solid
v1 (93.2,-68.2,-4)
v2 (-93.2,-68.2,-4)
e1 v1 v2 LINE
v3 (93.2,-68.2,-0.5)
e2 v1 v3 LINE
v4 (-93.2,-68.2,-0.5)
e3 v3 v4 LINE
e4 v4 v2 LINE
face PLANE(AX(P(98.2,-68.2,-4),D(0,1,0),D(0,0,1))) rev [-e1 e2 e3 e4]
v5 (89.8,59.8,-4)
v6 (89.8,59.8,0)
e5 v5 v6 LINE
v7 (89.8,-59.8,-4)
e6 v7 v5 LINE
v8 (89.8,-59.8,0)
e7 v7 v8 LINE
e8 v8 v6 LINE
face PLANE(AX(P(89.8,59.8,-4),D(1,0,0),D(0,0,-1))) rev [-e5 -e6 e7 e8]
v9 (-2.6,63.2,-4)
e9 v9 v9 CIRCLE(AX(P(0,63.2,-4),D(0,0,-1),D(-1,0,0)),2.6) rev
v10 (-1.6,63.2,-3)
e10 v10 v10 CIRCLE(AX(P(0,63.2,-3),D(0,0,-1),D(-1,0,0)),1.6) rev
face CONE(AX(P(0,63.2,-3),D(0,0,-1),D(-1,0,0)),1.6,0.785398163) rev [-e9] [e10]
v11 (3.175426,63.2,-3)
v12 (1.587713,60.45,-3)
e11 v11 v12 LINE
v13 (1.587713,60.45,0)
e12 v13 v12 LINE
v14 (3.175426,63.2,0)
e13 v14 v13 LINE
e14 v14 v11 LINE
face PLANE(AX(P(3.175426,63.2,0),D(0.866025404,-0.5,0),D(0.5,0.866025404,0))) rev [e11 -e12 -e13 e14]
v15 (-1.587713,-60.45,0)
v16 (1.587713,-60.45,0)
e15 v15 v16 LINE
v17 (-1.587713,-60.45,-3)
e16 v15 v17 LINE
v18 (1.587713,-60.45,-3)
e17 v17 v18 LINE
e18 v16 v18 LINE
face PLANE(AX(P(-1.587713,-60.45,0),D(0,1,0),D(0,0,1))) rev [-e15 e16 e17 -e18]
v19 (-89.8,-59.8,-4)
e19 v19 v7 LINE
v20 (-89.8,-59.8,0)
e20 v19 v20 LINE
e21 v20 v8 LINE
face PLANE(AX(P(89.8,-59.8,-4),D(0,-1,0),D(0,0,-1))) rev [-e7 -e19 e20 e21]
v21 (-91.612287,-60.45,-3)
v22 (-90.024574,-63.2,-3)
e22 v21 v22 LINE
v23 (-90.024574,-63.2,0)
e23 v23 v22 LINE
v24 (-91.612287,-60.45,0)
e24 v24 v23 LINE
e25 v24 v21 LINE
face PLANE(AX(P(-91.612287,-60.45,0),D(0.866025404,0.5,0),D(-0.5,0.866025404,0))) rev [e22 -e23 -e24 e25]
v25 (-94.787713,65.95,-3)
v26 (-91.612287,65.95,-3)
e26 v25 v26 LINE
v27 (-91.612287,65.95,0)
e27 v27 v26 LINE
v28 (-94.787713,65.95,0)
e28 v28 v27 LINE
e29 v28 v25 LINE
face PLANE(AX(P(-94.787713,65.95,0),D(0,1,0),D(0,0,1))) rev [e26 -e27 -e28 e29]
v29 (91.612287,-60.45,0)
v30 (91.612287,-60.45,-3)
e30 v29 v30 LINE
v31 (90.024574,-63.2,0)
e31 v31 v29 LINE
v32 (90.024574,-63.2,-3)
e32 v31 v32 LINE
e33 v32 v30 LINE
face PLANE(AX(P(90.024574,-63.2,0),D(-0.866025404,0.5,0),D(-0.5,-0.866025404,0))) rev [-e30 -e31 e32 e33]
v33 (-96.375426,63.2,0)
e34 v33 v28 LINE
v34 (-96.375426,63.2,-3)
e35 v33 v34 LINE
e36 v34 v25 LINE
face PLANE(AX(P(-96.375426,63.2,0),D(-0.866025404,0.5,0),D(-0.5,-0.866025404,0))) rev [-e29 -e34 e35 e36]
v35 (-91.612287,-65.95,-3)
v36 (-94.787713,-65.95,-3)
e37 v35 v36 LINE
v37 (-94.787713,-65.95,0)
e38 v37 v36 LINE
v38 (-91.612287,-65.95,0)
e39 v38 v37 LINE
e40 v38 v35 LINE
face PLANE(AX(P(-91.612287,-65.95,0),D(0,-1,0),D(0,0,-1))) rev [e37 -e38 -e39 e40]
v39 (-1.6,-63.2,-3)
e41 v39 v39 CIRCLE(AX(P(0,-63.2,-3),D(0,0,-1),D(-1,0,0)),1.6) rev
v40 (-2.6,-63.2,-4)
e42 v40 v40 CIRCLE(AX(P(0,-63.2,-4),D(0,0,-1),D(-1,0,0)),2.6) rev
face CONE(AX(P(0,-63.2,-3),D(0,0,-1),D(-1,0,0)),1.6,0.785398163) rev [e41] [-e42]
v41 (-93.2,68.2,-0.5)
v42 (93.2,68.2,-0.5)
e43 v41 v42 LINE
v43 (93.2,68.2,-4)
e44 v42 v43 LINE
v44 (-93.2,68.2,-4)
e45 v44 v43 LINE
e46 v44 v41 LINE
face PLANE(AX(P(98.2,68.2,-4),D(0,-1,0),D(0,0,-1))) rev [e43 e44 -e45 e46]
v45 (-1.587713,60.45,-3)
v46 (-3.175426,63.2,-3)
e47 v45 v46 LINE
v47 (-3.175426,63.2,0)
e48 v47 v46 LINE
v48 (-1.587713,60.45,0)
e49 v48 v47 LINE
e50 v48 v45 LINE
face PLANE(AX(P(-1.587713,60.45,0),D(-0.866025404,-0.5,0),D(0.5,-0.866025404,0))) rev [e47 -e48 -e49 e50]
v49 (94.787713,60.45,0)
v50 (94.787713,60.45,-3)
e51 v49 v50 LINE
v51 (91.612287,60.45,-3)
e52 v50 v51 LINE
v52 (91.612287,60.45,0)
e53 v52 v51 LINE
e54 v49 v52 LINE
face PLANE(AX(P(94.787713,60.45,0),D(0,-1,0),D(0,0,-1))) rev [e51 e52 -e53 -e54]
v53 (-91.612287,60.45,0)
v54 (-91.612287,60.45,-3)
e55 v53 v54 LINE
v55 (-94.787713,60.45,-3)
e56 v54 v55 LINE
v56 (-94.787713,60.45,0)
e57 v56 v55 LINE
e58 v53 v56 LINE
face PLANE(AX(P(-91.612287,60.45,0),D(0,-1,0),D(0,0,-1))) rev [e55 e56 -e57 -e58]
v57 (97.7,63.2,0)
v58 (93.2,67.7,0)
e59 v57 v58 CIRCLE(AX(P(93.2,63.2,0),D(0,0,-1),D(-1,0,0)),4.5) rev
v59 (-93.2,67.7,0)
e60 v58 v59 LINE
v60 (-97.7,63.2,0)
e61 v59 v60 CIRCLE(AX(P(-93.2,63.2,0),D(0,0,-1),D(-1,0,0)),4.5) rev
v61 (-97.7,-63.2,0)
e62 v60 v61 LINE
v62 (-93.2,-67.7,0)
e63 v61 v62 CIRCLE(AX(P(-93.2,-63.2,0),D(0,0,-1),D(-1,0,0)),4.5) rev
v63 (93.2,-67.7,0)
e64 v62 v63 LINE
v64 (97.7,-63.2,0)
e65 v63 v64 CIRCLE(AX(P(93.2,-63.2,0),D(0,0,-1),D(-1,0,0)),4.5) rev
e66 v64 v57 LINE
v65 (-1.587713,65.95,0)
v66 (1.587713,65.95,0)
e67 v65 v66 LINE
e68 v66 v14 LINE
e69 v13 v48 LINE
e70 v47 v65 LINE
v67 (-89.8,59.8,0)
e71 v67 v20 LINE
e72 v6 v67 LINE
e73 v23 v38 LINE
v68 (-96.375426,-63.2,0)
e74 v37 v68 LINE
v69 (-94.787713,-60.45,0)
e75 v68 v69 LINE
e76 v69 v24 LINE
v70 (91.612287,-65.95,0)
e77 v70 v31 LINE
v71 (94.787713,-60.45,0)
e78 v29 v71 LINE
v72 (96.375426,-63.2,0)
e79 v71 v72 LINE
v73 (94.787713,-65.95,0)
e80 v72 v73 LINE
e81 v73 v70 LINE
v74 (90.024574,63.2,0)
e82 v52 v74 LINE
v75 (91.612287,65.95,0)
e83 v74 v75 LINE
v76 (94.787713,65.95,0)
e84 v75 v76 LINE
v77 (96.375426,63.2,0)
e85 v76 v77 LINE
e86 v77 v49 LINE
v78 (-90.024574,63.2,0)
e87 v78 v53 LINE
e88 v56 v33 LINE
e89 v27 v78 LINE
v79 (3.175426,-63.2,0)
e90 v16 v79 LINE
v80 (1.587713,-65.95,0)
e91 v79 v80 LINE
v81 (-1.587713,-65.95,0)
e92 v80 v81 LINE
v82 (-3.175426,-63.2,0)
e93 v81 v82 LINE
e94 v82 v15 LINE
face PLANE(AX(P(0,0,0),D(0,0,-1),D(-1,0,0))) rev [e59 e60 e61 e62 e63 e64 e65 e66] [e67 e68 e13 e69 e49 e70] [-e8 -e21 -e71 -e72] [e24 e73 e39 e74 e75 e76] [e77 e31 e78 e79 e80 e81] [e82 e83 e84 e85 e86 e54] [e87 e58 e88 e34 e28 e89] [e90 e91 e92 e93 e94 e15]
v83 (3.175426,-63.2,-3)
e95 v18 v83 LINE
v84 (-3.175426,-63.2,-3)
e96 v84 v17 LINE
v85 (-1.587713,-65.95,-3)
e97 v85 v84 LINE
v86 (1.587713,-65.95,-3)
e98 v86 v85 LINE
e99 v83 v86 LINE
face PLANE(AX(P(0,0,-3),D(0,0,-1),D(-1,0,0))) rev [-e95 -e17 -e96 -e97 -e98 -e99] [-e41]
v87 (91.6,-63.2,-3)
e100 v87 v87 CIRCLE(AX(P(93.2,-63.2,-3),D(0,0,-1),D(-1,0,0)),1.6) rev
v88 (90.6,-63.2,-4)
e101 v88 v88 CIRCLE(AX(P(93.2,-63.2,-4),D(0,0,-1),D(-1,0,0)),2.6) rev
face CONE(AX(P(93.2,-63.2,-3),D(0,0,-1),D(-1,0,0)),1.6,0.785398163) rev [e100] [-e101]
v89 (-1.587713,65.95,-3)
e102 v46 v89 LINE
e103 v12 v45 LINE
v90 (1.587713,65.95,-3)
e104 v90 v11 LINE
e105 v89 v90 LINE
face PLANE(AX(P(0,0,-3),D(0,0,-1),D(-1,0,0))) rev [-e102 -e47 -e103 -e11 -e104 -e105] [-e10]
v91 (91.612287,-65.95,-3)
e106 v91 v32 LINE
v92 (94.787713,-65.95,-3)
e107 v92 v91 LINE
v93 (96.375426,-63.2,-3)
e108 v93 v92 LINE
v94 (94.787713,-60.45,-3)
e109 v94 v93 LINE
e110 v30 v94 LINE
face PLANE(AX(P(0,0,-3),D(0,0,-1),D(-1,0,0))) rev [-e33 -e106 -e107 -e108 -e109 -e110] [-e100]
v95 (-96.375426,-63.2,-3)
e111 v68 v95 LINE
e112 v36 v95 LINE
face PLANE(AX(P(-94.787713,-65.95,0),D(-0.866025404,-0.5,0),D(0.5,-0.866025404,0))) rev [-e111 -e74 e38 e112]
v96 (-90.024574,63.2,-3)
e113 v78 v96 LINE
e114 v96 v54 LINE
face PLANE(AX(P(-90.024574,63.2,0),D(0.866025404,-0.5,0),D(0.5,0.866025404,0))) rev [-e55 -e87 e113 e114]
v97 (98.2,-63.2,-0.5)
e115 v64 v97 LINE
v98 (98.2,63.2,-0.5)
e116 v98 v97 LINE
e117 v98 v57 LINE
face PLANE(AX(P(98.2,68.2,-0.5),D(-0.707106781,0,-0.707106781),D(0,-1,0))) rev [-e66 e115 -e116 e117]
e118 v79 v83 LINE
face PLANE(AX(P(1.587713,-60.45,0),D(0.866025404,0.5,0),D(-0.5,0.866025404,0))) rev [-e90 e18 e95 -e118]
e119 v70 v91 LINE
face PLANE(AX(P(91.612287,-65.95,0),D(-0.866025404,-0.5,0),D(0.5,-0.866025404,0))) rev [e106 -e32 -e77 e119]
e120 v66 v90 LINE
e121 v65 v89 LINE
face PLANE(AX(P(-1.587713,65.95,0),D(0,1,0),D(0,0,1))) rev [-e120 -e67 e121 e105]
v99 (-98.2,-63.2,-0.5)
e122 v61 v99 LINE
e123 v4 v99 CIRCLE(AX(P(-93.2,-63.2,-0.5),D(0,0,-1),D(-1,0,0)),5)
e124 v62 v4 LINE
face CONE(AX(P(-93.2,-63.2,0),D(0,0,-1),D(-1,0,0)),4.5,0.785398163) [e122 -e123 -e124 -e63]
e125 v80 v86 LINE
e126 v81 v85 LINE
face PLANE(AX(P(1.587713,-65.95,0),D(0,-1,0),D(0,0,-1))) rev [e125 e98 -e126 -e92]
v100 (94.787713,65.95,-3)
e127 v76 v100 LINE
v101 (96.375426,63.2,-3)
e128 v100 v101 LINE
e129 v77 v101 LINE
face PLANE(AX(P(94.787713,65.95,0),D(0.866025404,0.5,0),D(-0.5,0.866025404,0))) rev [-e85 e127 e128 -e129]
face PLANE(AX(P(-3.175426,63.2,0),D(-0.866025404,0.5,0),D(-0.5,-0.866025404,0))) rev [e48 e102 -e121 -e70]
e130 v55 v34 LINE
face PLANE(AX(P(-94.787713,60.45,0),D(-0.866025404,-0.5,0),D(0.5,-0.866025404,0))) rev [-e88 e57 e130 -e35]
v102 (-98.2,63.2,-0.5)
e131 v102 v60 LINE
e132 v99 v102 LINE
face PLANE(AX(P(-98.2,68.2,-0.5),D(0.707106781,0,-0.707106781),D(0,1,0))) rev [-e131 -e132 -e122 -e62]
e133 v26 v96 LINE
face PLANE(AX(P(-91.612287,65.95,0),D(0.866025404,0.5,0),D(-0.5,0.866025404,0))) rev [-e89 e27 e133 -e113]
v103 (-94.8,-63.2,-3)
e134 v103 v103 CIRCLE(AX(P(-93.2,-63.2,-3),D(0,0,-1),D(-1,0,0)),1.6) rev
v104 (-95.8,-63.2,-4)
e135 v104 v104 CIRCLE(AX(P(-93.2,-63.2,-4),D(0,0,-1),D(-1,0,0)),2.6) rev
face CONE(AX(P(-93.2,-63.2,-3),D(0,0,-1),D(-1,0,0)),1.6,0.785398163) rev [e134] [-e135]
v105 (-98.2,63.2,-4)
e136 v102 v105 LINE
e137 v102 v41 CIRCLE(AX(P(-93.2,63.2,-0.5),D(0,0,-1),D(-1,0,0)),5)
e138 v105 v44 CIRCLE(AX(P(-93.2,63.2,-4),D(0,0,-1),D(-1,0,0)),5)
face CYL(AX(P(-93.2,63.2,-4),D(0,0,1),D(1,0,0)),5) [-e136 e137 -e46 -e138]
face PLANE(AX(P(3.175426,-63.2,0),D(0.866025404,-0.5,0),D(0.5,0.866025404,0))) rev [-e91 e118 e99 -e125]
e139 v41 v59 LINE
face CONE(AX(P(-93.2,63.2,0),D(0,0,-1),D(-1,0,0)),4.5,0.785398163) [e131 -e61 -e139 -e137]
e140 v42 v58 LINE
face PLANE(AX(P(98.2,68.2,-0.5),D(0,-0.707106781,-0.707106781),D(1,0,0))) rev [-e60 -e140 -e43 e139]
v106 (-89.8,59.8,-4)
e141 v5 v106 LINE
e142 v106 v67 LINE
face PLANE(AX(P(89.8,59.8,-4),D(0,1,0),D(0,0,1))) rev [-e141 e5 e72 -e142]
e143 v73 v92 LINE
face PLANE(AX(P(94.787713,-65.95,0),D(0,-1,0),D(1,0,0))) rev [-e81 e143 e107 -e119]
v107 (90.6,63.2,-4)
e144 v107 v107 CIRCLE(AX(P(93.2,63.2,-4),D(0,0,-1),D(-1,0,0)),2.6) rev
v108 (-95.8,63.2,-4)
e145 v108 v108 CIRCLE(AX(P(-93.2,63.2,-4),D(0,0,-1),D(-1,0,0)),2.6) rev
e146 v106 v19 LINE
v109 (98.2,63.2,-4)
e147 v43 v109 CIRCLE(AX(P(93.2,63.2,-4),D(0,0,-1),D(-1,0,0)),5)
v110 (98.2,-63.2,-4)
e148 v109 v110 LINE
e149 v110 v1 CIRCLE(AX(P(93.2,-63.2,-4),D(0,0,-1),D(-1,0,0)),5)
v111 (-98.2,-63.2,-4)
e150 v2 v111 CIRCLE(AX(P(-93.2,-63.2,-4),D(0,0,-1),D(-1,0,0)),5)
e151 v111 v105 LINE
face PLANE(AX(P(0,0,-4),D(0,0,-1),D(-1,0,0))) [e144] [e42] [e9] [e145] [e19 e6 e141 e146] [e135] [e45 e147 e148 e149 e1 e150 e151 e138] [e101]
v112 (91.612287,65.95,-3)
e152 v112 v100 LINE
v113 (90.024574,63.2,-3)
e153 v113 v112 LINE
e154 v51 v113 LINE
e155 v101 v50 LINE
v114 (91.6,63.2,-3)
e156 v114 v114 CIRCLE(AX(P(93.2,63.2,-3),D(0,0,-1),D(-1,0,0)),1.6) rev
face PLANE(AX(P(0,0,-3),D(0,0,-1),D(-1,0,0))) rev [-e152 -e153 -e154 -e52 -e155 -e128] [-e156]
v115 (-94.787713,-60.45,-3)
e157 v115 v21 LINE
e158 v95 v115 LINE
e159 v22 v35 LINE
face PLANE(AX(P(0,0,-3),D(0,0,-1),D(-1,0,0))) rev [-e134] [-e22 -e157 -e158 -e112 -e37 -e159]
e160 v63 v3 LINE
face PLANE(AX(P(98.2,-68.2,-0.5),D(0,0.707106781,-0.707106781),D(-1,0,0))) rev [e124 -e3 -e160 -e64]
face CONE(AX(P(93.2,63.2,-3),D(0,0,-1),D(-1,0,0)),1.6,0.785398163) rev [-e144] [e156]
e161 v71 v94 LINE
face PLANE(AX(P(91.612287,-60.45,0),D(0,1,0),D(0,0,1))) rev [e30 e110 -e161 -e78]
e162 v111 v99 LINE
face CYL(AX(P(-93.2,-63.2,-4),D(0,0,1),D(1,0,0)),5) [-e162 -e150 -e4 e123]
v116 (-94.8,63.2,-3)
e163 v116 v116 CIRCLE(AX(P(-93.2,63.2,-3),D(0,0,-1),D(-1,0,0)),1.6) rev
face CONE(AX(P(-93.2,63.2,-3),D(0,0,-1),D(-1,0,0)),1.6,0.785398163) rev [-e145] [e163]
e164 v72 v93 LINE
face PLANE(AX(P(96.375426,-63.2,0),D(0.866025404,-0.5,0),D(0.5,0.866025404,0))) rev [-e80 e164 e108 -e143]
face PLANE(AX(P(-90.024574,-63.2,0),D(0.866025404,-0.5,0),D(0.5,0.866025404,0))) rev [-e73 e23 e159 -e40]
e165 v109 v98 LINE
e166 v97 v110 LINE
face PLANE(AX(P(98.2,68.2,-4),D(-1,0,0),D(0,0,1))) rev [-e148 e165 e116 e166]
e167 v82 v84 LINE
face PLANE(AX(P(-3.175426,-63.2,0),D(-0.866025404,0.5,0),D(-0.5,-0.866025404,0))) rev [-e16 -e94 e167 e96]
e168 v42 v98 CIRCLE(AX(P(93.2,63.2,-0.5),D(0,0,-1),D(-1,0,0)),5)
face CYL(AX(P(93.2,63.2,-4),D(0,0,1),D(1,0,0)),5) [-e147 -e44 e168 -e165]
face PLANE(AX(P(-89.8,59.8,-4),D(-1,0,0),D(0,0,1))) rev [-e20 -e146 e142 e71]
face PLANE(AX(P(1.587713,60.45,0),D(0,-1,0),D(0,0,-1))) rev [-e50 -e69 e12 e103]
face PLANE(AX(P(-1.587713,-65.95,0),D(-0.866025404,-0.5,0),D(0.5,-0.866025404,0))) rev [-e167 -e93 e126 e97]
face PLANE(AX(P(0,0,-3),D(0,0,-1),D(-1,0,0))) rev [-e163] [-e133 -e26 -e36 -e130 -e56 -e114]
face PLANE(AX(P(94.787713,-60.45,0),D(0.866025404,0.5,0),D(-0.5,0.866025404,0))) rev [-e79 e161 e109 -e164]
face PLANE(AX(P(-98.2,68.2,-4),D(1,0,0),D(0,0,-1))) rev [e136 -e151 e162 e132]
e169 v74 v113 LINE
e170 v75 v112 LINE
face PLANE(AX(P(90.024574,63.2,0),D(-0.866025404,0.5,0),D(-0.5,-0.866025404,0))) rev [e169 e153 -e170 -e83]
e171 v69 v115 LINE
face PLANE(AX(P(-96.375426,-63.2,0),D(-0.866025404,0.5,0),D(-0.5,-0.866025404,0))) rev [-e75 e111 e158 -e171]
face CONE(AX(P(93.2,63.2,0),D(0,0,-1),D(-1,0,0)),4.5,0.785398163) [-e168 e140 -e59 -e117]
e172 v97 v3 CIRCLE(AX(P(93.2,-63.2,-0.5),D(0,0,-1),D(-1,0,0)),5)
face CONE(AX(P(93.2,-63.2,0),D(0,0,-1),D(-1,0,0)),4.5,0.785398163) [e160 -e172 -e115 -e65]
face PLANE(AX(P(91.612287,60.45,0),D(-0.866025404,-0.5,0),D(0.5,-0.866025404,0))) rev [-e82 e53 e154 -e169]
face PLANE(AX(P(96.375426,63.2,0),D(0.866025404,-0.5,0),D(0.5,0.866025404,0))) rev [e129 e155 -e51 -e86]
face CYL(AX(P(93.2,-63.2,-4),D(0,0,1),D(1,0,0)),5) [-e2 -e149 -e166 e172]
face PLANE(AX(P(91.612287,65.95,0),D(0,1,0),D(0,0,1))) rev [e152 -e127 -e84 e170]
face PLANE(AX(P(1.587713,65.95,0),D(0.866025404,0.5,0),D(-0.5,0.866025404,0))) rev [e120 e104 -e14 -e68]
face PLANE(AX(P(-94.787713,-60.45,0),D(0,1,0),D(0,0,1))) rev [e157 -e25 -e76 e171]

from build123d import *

# Parameters (mm, degrees)
CROQUIS1_W              = 179.6
CROQUIS1_H              = 119.6
CROQUIS1_W_2            = 176.4
CROQUIS1_H_2            = 116.4
SALIENTE_EXTRUIR1_DEPTH = 40
CROQUIS2_W              = 196.4
CROQUIS2_H              = 136.4
CROQUIS2_W_2            = 176.4
CROQUIS2_H_2            = 116.4
SALIENTE_EXTRUIR2_DEPTH = 4
CROQUIS10_W             = 179.6
CROQUIS10_H             = 119.6
CORTAR_EXTRUIR6_DEPTH   = 128.398901094
CROQUIS7_R              = 1.6
CORTAR_EXTRUIR3_DEPTH   = 120.626418487
CORTAR_EXTRUIR5_START   = -1
CORTAR_EXTRUIR5_DEPTH   = 119.626418487
REDONDEO1_R             = 5
CHAFL_N2_SIZE           = 0.5
CHAFL_N3_SIZE           = 1


with BuildPart() as part:
    # Croquis1 → Saliente-Extruir1 (new body)
    with BuildSketch(Plane.XY):
        Rectangle(CROQUIS1_W, CROQUIS1_H)
        Rectangle(CROQUIS1_W_2, CROQUIS1_H_2, mode=Mode.SUBTRACT)
    extrude(amount=SALIENTE_EXTRUIR1_DEPTH)

    # Croquis2 → Saliente-Extruir2 (add)
    with BuildSketch(Plane(origin=(0, 0, 0), x_dir=(-1, 0, 0), z_dir=(0, 0, -1))):
        Rectangle(CROQUIS2_W, CROQUIS2_H)
        Rectangle(CROQUIS2_W_2, CROQUIS2_H_2, mode=Mode.SUBTRACT)
    extrude(amount=SALIENTE_EXTRUIR2_DEPTH)

    # Croquis10 → Cortar-Extruir6 (cut, through all)
    with BuildSketch(Plane.XY.offset(40)):
        Rectangle(CROQUIS10_W, CROQUIS10_H)
    extrude(amount=-CORTAR_EXTRUIR6_DEPTH, mode=Mode.SUBTRACT)

    # Croquis7 → Cortar-Extruir3 (cut, through all)
    with BuildSketch(Plane(origin=(0, 0, -4), x_dir=(-1, 0, 0), z_dir=(0, 0, -1))):
        with Locations((0, 63.2)):
            Circle(CROQUIS7_R)
        with Locations((93.2, 63.2)):
            Circle(CROQUIS7_R)
        with Locations(Location((-93.2, 63.2, 0), (0, 0, 180))):
            Circle(CROQUIS7_R)
        with Locations((-93.2, -63.2)):
            Circle(CROQUIS7_R)
        with Locations(Location((93.2, -63.2, 0), (0, 0, 180))):
            Circle(CROQUIS7_R)
        with Locations(Location((0, -63.2, 0), (0, 0, 180))):
            Circle(CROQUIS7_R)
    extrude(amount=-CORTAR_EXTRUIR3_DEPTH, mode=Mode.SUBTRACT)

    # Croquis9 → Cortar-Extruir5 (cut, through all)
    with BuildSketch(Plane(origin=(0, 0, -4), x_dir=(-1, 0, 0), z_dir=(0, 0, -1)).offset(CORTAR_EXTRUIR5_START)):
        Polygon((-90.024573519, 63.2), (-91.61228676, 65.95), (-94.78771324, 65.95), (-96.375426481, 63.2), (-94.78771324, 60.45), (-91.61228676, 60.45), align=None)
        Polygon((3.175426481, 63.2), (1.58771324, 65.95), (-1.58771324, 65.95), (-3.175426481, 63.2), (-1.58771324, 60.45), (1.58771324, 60.45), align=None)
        Polygon((3.175426481, -63.2), (1.58771324, -60.45), (-1.58771324, -60.45), (-3.175426481, -63.2), (-1.58771324, -65.95), (1.58771324, -65.95), align=None)
        Polygon((-90.024573519, -63.2), (-91.61228676, -60.45), (-94.78771324, -60.45), (-96.375426481, -63.2), (-94.78771324, -65.95), (-91.61228676, -65.95), align=None)
        Polygon((96.375426481, -63.2), (94.78771324, -60.45), (91.61228676, -60.45), (90.024573519, -63.2), (91.61228676, -65.95), (94.78771324, -65.95), align=None)
        Polygon((96.375426481, 63.2), (94.78771324, 65.95), (91.61228676, 65.95), (90.024573519, 63.2), (91.61228676, 60.45), (94.78771324, 60.45), align=None)
    extrude(amount=-CORTAR_EXTRUIR5_DEPTH, mode=Mode.SUBTRACT)

    # Redondeo1
    redondeo1_edges = [part.edges().sort_by_distance(p)[0] for p in [
        (-98.2, -68.2, -2),
        (-98.2, 68.2, -2),
        (98.2, 68.2, -2),
        (98.2, -68.2, -2),
    ]]
    fillet(redondeo1_edges, radius=REDONDEO1_R)

    # Chaflán2
    chafl_n2_edges = [part.edges().sort_by_distance(p)[0] for p in [
        (98.2, 0, 0),
        (-98.2, 0, 0),
        (0, -68.2, 0),
        (0, 68.2, 0),
        (-96.735533906, 66.735533906, 0),
        (-96.735533906, -66.735533906, 0),
        (96.735533906, -66.735533906, 0),
        (96.735533906, 66.735533906, 0),
    ]]
    chamfer(chafl_n2_edges, length=CHAFL_N2_SIZE)

    # Chaflán3
    chafl_n3_edges = [part.edges().sort_by_distance(p)[0] for p in [
        (-91.6, 63.2, -4),
        (91.6, 63.2, -4),
        (94.8, -63.2, -4),
        (-94.8, -63.2, -4),
        (-1.6, -63.2, -4),
        (1.6, 63.2, -4),
    ]]
    chamfer(chafl_n3_edges, length=CHAFL_N3_SIZE - 0.0001)  # a hair under: the kernel refuses the full size


solid = part.part
